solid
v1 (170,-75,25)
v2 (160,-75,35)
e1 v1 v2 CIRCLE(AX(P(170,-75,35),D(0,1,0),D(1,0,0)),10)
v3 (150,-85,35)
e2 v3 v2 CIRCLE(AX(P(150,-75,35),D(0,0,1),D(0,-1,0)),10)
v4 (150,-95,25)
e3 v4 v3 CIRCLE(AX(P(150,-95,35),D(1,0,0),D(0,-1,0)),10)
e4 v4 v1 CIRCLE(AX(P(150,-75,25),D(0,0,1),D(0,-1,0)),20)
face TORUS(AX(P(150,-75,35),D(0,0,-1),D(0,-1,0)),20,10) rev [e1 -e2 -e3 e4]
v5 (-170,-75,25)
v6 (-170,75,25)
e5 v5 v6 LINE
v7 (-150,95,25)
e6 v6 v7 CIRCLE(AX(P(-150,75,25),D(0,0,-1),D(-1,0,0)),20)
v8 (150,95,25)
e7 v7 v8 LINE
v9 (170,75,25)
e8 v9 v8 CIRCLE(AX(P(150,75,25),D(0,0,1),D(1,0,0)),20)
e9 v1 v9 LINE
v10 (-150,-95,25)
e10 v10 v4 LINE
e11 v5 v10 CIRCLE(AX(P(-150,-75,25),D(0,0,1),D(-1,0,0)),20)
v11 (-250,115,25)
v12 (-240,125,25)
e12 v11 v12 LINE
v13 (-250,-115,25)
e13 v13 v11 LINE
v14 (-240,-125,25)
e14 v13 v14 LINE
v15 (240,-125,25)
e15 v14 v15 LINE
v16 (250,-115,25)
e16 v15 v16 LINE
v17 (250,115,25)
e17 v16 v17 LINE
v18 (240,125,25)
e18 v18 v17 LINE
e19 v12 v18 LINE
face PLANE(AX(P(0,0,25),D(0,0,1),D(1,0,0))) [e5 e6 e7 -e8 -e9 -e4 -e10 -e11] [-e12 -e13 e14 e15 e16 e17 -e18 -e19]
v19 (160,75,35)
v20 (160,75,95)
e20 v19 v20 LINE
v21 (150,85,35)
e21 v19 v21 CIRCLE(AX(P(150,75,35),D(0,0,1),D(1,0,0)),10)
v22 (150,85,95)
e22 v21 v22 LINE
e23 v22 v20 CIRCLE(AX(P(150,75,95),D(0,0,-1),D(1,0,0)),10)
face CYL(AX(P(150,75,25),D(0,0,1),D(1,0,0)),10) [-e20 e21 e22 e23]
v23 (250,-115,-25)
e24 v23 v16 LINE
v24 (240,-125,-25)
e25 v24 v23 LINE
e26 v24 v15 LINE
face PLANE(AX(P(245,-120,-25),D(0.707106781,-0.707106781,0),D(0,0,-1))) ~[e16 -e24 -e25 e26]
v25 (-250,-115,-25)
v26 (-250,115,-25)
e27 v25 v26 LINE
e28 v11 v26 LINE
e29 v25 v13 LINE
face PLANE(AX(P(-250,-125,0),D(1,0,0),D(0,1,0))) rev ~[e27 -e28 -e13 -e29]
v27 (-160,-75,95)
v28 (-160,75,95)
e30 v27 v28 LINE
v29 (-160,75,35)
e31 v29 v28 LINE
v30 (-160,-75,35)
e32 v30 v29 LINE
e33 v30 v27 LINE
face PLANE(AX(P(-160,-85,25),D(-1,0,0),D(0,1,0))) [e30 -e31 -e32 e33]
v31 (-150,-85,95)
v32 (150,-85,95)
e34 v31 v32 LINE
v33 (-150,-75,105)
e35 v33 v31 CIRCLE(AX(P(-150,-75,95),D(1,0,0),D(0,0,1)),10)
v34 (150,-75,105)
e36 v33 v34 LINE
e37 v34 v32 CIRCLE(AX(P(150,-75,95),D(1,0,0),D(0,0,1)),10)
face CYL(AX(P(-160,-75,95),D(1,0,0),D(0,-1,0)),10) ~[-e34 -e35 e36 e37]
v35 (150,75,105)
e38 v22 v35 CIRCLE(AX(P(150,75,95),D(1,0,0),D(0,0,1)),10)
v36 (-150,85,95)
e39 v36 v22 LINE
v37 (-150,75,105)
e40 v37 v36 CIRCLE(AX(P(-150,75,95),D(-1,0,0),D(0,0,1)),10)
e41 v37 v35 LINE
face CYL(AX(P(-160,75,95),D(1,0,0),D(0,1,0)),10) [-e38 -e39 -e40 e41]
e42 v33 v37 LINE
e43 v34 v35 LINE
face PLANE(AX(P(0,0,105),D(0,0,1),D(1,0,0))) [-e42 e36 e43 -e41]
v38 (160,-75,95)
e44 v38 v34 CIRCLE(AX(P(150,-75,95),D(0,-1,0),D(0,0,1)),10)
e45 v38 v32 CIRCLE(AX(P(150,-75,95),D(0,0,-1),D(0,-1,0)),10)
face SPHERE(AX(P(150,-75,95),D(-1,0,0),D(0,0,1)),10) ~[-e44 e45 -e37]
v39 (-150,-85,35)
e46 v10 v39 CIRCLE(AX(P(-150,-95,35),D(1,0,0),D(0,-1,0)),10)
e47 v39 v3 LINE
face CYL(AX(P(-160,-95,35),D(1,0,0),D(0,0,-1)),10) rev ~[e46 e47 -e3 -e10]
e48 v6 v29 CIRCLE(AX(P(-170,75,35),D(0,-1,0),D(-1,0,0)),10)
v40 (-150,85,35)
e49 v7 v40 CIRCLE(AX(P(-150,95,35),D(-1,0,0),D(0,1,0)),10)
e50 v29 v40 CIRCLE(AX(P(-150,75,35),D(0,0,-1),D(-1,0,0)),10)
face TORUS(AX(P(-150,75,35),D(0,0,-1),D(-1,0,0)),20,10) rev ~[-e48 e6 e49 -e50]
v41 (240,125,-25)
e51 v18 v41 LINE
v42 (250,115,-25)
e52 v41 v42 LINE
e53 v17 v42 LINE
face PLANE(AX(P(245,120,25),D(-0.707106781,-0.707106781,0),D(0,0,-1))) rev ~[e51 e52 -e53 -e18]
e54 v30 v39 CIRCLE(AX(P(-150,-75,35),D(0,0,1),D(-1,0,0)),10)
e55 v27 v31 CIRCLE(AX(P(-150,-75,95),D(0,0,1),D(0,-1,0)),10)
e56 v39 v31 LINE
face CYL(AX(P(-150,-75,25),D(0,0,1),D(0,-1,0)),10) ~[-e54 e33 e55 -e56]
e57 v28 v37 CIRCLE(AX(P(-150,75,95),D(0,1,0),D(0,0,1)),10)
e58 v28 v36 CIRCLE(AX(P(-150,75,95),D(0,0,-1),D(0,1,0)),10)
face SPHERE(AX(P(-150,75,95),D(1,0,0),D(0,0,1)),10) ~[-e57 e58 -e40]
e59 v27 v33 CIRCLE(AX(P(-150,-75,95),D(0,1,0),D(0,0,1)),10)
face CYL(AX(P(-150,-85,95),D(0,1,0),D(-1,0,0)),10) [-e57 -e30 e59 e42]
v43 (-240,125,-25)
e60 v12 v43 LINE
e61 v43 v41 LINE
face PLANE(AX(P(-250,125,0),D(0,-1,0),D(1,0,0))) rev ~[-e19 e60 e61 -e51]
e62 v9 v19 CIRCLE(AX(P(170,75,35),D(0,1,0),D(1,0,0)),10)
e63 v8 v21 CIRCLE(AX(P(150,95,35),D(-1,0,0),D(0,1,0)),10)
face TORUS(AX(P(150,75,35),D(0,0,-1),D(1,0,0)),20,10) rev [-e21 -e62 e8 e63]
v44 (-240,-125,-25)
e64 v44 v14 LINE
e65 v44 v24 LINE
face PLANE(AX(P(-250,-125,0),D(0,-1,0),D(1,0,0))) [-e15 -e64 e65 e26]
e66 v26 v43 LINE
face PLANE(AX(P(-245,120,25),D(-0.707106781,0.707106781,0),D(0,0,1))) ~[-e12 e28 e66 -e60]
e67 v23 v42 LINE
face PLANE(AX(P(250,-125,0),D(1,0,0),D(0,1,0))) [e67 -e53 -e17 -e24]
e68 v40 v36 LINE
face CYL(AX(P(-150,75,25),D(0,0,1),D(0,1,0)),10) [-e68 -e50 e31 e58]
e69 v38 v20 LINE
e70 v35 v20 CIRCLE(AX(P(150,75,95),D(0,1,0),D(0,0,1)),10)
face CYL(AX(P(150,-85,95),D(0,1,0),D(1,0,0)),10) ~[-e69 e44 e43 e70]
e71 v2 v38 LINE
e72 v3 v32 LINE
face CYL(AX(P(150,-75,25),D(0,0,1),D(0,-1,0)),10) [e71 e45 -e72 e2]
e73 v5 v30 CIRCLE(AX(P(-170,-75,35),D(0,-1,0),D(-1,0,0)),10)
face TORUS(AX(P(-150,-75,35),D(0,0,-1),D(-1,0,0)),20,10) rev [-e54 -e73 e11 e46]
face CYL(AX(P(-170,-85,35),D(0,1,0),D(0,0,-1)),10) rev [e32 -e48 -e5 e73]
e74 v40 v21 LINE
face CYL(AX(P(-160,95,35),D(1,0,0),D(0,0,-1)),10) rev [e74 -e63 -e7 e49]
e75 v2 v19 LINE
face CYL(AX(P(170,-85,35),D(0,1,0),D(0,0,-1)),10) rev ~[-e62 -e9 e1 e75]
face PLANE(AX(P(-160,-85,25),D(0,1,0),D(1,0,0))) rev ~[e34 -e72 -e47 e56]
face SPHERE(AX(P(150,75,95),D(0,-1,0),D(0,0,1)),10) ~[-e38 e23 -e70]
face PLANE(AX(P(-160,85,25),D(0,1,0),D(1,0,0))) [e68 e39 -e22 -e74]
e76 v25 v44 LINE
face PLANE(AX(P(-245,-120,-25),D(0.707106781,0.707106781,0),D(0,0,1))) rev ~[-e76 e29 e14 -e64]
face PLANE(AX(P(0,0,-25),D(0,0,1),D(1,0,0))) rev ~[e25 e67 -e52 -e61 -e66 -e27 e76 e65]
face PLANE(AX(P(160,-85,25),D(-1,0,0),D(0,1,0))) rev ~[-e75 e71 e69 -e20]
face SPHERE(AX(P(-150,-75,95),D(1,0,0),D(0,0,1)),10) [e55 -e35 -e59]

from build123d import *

# Parameters (mm, degrees)
F0_W     = 500
F0_H     = 250
F1_DEPTH = 25
F2_W     = 320
F2_H     = 170
F3_DEPTH = 80
F4_R     = 10
F5_SIZE  = 10


with BuildPart() as f1:
    # F0 (on Top) → F1 (new body, symmetric)
    with BuildSketch(Plane.XY):
        Rectangle(F0_W, F0_H)
    extrude(amount=F1_DEPTH, both=True)

    # F2 (on face) → F3 (join)
    with BuildSketch(Plane.XY.offset(25)):
        Rectangle(F2_W, F2_H)
    extrude(amount=F3_DEPTH)

    # F4
    f4_edges = [f1.edges().sort_by_distance(p)[0] for p in [
        (0, -85, 105),
        (160, 0, 105),
        (0, 85, 105),
        (-160, 0, 105),
        (-160, -85, 65),
        (160, -85, 65),
        (160, 85, 65),
        (-160, 85, 65),
        (-160, 0, 25),
        (0, -85, 25),
        (160, 0, 25),
        (0, 85, 25),
    ]]
    fillet(f4_edges, radius=F4_R)

    # F5
    f5_edges = [f1.edges().sort_by_distance(p)[0] for p in [
        (-250, -125, 0),
        (-250, 125, 0),
        (250, 125, 0),
        (250, -125, 0),
    ]]
    chamfer(f5_edges, length=F5_SIZE)


solid = f1.part
